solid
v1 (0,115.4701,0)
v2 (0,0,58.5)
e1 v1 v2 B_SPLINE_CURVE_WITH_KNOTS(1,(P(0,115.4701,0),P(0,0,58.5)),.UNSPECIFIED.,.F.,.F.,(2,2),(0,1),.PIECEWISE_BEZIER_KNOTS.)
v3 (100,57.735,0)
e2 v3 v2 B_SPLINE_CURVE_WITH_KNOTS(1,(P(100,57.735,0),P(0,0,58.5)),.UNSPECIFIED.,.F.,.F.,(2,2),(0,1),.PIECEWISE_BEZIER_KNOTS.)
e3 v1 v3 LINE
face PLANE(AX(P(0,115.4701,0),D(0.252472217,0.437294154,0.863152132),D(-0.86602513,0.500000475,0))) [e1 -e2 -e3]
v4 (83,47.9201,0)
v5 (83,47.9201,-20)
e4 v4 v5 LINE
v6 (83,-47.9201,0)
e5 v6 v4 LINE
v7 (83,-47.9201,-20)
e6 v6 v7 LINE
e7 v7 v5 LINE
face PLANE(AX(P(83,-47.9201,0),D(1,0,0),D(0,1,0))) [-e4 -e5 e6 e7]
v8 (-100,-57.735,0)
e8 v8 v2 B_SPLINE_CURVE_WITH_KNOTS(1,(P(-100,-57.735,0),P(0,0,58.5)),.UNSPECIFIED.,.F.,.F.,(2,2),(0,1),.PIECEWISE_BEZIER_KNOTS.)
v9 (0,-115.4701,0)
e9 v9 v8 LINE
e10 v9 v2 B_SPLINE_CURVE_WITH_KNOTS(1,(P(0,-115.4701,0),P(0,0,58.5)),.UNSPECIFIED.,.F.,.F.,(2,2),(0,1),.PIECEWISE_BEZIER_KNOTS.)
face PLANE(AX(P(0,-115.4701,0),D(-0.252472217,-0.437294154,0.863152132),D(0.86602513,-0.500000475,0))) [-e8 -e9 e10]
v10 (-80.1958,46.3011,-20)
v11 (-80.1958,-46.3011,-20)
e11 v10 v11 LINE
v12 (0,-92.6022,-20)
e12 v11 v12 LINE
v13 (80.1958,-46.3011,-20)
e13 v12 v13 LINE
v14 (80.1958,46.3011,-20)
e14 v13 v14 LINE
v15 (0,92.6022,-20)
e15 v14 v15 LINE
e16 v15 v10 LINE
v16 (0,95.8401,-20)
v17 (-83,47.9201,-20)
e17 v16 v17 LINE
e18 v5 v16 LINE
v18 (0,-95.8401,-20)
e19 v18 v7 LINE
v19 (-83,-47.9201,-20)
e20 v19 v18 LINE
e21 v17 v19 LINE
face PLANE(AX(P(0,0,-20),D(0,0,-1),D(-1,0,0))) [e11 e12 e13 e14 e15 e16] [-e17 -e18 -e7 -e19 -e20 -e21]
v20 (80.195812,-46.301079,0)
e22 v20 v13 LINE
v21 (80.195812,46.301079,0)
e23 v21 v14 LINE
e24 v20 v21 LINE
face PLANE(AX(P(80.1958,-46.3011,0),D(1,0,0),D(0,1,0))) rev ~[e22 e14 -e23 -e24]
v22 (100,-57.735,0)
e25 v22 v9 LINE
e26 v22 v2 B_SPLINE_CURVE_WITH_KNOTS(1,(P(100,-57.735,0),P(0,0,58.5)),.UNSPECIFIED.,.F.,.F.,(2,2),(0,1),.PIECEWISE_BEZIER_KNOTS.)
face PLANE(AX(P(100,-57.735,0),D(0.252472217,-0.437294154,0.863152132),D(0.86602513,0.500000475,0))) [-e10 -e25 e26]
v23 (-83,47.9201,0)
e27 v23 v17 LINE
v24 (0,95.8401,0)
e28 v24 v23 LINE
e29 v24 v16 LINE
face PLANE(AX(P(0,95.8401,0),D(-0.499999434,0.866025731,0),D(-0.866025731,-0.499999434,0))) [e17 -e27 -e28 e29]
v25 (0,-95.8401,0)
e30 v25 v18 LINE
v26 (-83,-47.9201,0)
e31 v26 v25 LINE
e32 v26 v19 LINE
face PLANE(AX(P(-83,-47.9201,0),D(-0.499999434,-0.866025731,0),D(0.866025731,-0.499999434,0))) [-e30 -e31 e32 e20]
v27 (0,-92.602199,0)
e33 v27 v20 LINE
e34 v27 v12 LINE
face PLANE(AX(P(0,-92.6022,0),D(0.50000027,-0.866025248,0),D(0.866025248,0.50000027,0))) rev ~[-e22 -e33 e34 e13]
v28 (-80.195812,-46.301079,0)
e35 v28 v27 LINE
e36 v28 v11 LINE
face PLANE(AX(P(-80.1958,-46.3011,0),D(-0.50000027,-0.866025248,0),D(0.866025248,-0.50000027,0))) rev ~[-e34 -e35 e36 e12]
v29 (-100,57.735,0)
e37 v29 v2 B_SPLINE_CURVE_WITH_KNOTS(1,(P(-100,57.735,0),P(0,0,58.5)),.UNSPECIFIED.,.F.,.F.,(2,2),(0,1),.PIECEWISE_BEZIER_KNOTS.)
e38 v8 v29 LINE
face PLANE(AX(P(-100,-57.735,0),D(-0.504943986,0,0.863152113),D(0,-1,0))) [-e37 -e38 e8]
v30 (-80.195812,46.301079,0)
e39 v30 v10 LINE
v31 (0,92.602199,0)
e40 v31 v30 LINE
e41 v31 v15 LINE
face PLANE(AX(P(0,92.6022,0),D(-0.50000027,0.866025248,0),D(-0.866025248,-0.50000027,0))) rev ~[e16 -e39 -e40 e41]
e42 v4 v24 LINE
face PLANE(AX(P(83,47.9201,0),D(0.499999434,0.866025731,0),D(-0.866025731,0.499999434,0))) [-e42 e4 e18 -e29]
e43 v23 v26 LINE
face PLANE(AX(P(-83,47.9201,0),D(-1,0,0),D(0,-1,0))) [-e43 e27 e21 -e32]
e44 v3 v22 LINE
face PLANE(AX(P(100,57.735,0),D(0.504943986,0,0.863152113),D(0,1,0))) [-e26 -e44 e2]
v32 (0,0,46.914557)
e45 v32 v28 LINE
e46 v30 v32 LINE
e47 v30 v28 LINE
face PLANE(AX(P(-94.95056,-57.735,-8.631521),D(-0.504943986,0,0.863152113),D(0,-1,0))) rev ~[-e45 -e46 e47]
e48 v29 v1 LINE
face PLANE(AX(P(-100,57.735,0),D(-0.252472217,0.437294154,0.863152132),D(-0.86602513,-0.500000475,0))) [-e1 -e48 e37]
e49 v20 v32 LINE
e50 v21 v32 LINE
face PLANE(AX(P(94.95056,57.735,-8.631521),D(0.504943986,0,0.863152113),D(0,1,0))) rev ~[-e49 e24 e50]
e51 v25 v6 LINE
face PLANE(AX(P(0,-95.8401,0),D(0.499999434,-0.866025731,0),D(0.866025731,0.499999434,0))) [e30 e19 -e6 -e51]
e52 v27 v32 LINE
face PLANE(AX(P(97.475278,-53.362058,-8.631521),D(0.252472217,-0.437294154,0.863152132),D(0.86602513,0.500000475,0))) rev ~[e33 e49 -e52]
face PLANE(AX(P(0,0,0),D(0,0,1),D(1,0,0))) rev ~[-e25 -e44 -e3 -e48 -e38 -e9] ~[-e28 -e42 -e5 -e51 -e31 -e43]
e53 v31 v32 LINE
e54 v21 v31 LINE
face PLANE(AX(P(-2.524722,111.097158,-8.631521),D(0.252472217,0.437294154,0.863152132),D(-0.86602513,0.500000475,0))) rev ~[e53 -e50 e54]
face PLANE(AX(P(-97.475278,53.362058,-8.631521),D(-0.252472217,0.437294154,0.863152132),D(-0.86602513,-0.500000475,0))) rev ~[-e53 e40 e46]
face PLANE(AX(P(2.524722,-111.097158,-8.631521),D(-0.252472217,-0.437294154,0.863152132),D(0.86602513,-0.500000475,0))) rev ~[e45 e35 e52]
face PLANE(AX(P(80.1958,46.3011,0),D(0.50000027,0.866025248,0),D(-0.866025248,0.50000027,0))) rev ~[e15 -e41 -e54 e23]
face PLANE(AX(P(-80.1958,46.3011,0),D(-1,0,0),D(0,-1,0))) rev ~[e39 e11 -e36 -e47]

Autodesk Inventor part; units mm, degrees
ref_plane "YZ Plane" through (0, 0, 0) normal (1, 0, 0) x (0, 1, 0)
ref_plane "XZ Plane" through (0, 0, 0) normal (0, 1, 0) x (-1, 0, 0)
sketch "Sketch1" plane through (0, 0, 0) normal (0, 0, 1) x (1, 0, 0)
  line L0 (-100, 57.735) -> (0, 115.4701)
  line L1 (0, 115.4701) -> (100, 57.735)
  line L2 (100, 57.735) -> (100, -57.735)
  line L3 (100, -57.735) -> (0, -115.4701)
  line L4 (0, -115.4701) -> (-100, -57.735)
  line L5 (-100, -57.735) -> (-100, 57.735)
  line L6 (-95, 54.8483) -> (0, 109.6966)
  line L7 (0, 109.6966) -> (95, 54.8483)
  line L8 (95, 54.8483) -> (95, -54.8483)
  line L9 (95, -54.8483) -> (0, -109.6966)
  line L10 (0, -109.6966) -> (-95, -54.8483)
  line L11 (-95, -54.8483) -> (-95, 54.8483)
  line L12 (-100, -57.735) -> (0, 0)
  line L13 (0, 0) -> (0, -115.4701)
  line L14 (100, -57.735) -> (0, 0)
  line L15 (100, 57.735) -> (0, 0)
  line L16 (0, 115.4701) -> (0, 0)
  line L17 (-100, 57.735) -> (0, 0)
  line L18 (0, -109.6966) -> (0, 0)
  line L19 (95, -54.8483) -> (0, 0)
  line L20 (95, 54.8483) -> (0, 0)
  line L21 (0, 109.6966) -> (0, 0)
  line L22 (-95, 54.8483) -> (0, 0)
  line L23 (-95, -54.8483) -> (0, 0)
  dimension "d0" = 200
  dimension "d1" = 190
ref_plane "Work Plane1" through (0, 0, 58.5) normal (0, 0, 1) x (1, 0, 0)
sketch "Sketch2" plane through (0, 0, 58.5) normal (0, 0, 1) x (1, 0, 0)
  point P0 (0, 0)
  point P1 (0, 0)
extrude "Extrusion1" add sketch "Sketch1" along normal up to surface (58.5 mm away)
loft "Loft1" cut keep common part section 1 edges at (-50, -86.6025, 0) (-100, 0, 0) (-50, 86.6025, 0) (50, 86.6025, 0) (100, 0, 0) (50, -86.6025, 0) section 2 point at (0, 0, 58.5)
shell "Shell1" thickness 10 removed faces 1 at (0, 0, 0)
sketch "Sketch4" plane through (0, 0, 0) normal (0, 0, -1) x (-1, 0, 0)
  line L0 (0, -92.6022) -> (-80.1958, -46.3011) projected
  line L1 (0, -92.6022) -> (-80.1958, -46.3011)
  line L2 (-80.1958, -46.3011) -> (-80.1958, 46.3011)
  line L3 (-80.1958, 46.3011) -> (0, 92.6022)
  line L4 (0, 92.6022) -> (80.1958, 46.3011)
  line L5 (80.1958, 46.3011) -> (80.1958, -46.3011)
  line L6 (80.1958, -46.3011) -> (0, -92.6022)
  line L7 (0, -95.8401) -> (-83, -47.9201)
  line L8 (-83, -47.9201) -> (-83, 47.9201)
  line L9 (-83, 47.9201) -> (0, 95.8401)
  line L10 (0, 95.8401) -> (83, 47.9201)
  line L11 (83, 47.9201) -> (83, -47.9201)
  line L12 (83, -47.9201) -> (0, -95.8401)
  line L13 (83, -47.9201) -> (80.1958, -46.3011)
  line L14 (0, -95.8401) -> (0, -92.6022)
  line L15 (-83, -47.9201) -> (-80.1958, -46.3011)
  line L16 (-83, 47.9201) -> (-80.1958, 46.3011)
  line L17 (0, 95.8401) -> (0, 92.6022)
  line L18 (80.1958, 46.3011) -> (83, 47.9201)
  point P0 (0, 0)
  point P1 (0, 0)
  point P2 (0, 0)
  dimension "d18" = 166
extrude "Extrusion3" add sketch "Sketch4" along normal blind 20 contours L14 L7 L15 L0 | L6 L13 L12 L14 | L15 L8 L16 L2 | L5 L18 L11 L13 | L16 L9 L17 L3 | L4 L17 L10 L18
properties part number "Phage_Hat"
